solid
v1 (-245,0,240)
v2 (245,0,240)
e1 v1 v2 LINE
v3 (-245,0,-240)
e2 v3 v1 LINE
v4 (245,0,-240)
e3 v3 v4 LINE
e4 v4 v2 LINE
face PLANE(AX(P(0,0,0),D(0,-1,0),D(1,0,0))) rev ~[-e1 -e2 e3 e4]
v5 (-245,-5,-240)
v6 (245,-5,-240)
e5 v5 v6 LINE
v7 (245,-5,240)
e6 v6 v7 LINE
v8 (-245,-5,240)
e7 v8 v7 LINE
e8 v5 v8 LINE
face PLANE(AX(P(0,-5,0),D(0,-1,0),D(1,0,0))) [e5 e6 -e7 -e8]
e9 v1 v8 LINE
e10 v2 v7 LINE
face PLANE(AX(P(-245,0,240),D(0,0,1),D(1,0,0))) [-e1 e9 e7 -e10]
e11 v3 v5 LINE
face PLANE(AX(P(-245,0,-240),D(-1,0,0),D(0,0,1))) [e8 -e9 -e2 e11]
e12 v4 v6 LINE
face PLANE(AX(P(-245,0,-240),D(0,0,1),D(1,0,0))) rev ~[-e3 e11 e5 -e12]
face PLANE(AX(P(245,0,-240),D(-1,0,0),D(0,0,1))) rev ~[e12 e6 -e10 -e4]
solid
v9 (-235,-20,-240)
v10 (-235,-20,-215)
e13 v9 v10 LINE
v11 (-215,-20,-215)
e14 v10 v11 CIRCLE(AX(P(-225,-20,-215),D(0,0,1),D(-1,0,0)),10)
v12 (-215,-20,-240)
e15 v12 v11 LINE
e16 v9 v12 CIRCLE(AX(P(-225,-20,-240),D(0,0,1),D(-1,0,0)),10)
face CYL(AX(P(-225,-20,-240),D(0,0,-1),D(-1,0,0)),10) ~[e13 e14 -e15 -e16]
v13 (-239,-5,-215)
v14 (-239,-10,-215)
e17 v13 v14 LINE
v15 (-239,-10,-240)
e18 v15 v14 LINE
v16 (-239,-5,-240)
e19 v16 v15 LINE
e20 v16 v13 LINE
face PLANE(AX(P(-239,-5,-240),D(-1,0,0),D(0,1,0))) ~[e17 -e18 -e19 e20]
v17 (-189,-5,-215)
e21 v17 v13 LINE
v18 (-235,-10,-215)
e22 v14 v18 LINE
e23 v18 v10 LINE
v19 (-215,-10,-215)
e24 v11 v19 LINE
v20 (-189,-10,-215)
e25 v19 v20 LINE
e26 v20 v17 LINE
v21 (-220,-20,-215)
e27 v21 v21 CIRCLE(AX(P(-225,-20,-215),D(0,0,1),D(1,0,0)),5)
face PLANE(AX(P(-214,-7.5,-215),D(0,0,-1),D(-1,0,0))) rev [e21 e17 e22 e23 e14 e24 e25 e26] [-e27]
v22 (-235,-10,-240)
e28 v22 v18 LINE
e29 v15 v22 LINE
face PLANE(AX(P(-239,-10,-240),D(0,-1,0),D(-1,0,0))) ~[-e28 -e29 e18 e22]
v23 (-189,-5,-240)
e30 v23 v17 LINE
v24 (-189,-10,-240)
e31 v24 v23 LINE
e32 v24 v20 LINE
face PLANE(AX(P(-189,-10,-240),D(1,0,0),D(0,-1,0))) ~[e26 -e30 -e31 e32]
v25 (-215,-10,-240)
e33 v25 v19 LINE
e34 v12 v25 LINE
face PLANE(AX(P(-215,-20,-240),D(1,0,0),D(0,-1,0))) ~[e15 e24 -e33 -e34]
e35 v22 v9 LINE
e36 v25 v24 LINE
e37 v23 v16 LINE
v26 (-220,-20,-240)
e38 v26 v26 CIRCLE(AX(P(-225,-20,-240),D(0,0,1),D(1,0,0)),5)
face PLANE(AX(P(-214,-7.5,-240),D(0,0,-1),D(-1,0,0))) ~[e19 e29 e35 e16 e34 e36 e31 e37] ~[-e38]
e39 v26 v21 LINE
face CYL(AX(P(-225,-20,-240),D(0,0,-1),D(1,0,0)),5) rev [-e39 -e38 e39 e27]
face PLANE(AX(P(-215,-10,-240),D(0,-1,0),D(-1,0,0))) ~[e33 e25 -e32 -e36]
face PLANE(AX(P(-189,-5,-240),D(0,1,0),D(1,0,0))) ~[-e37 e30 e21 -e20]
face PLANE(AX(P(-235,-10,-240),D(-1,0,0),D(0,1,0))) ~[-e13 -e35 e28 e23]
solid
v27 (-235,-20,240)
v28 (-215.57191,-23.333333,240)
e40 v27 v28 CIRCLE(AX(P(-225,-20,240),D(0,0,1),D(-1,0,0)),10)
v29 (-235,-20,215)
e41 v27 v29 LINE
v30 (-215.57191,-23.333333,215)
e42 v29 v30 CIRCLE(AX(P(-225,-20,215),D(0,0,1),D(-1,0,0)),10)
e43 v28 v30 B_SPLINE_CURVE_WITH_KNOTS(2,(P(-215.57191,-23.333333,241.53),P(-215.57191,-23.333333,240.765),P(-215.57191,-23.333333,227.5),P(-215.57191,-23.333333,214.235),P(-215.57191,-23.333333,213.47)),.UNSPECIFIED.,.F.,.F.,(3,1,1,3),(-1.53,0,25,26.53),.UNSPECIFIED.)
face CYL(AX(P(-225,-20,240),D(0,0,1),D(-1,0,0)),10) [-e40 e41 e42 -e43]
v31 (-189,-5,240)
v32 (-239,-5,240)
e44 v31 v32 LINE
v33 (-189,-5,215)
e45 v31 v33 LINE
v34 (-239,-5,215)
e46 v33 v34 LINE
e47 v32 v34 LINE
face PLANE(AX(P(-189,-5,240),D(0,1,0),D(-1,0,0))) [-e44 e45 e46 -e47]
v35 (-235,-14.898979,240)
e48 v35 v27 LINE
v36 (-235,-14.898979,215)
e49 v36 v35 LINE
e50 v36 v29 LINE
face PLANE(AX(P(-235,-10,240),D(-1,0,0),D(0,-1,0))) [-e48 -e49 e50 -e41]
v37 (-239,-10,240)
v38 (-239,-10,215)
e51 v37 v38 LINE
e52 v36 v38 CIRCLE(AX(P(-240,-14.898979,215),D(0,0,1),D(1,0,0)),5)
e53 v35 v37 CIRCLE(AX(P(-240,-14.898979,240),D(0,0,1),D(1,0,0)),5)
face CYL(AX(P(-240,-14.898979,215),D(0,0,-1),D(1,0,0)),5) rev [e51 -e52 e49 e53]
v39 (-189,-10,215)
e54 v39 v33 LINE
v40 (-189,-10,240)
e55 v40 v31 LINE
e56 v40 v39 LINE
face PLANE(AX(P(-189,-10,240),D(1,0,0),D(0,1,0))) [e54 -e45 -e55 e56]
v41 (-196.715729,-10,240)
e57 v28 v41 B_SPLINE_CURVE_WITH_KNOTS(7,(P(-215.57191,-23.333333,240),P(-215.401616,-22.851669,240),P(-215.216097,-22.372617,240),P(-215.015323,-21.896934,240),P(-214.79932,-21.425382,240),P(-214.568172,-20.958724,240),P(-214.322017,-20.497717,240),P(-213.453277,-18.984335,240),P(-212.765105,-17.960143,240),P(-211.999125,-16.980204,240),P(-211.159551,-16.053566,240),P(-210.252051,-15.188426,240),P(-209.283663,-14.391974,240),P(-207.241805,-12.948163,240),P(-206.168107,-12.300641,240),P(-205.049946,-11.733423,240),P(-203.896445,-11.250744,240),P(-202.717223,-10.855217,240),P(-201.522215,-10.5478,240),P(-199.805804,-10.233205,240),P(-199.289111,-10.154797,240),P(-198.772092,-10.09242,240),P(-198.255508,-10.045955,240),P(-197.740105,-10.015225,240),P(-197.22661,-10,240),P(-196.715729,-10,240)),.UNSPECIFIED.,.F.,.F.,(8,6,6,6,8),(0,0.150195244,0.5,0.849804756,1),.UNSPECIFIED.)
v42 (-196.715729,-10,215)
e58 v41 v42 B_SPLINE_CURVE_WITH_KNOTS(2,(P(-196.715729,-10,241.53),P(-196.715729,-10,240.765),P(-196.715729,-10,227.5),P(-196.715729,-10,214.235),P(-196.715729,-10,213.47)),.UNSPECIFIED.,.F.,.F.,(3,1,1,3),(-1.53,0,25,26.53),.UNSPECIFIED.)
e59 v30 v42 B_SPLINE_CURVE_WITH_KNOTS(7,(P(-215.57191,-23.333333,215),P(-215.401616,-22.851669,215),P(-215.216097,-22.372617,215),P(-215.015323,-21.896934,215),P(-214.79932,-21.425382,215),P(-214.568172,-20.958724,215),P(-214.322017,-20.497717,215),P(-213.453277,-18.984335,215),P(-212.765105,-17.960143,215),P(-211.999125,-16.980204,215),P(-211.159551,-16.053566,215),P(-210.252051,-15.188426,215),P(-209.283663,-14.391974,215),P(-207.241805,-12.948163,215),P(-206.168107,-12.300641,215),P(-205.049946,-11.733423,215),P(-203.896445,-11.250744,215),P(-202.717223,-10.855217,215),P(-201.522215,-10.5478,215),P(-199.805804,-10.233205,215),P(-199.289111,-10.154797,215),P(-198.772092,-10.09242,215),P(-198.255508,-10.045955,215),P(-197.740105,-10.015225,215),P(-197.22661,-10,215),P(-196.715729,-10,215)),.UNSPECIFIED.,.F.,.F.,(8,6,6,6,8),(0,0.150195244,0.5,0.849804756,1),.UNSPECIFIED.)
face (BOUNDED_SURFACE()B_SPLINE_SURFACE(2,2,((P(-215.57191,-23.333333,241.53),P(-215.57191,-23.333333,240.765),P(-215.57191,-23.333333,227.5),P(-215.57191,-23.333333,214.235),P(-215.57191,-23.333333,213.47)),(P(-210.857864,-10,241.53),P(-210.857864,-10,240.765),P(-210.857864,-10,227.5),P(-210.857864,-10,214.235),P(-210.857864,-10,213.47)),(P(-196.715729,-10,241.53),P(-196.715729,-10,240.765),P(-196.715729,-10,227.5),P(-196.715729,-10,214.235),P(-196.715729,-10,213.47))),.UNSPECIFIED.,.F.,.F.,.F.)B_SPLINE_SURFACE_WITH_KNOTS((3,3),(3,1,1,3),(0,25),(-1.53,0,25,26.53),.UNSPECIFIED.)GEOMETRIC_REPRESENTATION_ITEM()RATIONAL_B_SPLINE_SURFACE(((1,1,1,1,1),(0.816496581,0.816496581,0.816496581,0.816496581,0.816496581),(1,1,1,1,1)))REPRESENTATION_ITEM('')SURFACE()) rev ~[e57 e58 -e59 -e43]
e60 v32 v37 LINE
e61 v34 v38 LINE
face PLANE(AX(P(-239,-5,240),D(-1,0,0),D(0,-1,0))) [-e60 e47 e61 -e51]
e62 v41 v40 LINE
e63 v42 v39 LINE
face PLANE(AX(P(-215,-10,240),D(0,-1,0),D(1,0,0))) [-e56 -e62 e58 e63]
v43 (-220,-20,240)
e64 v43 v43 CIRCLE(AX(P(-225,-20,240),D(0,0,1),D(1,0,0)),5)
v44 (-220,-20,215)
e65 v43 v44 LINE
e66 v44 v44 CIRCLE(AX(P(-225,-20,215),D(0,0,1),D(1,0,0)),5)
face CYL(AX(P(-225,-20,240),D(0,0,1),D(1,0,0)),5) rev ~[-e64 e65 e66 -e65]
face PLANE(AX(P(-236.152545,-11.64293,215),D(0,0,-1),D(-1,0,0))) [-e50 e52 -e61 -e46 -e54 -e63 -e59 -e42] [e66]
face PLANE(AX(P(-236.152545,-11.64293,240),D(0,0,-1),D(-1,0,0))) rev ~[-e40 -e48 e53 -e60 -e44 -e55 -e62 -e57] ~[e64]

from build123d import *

# Parameters (mm, degrees)
F0_W        = 490
F0_H        = 480
F1_DEPTH    = 5
F2_R        = 5
F3_DEPTH    = 25
F6_R        = 20
F7_T1_DEPTH = 25


# Not quite as in the source:
# - a fillet or chamfer that OpenCascade refuses, or shapes differently, is made with other operations: its cross-section is extruded or revolved along the edge and cut away or added


with BuildPart() as f1:
    # F0 (on Front) → F1 (new body)
    with BuildSketch(Plane.XZ):
        Rectangle(F0_W, F0_H)
    extrude(amount=F1_DEPTH)


with BuildPart() as f3:
    # F2 (on face) → F3 (new body)
    with BuildSketch(Plane.XY.offset(240)):
        Polygon((-189, -10), (-189, -5), (-239, -5), (-239, -10), (-235, -10), (-225, -10), (-215, -10), align=None)
        with BuildLine():
            ThreePointArc((-215, -20), (-217.9289321881, -12.9289321881), (-225, -10))
            ThreePointArc((-225, -10), (-232.0710678119, -12.9289321881), (-235, -20))
            ThreePointArc((-235, -20), (-225, -30), (-215, -20))
        make_face()
        with Locations((-225, -20)):
            Circle(F2_R, mode=Mode.SUBTRACT)
        with BuildLine():
            Line((-215, -20), (-215, -10))
            Line((-215, -10), (-225, -10))
            ThreePointArc((-225, -10), (-217.9289321881, -12.9289321881), (-215, -20))
        make_face()
        with BuildLine():
            Line((-225, -10), (-235, -10))
            Line((-235, -10), (-235, -20))
            ThreePointArc((-235, -20), (-232.0710678119, -12.9289321881), (-225, -10))
        make_face()
    extrude(amount=-F3_DEPTH)


with BuildPart() as f4_1:
    # F4: instance of F3
    add(f3.part.mirror(Plane.XY))


with BuildPart() as f3_1:
    add(f3.part)

    # F6
    f6_edges = [f3_1.edges().sort_by_distance(p)[0] for p in [
        (-215, -10, 227.5),
    ]]
    fillet(f6_edges, radius=F6_R)

    # F7: fillet of radius 5 on 1 edges, made by hand

    # F7_s2 → F7_t1 (join)
    with BuildSketch(Plane.XY.offset(215)):
        with BuildLine():
            ThreePointArc((-235, -14.8989794856), (-236.1270166538, -11.7367018254), (-239, -10))
            Line((-239, -10), (-235, -10))
            Line((-235, -10), (-235, -14.8989794856))
        make_face()
    extrude(amount=F7_T1_DEPTH)


solid = Compound([f1.part, f4_1.part, f3_1.part])
